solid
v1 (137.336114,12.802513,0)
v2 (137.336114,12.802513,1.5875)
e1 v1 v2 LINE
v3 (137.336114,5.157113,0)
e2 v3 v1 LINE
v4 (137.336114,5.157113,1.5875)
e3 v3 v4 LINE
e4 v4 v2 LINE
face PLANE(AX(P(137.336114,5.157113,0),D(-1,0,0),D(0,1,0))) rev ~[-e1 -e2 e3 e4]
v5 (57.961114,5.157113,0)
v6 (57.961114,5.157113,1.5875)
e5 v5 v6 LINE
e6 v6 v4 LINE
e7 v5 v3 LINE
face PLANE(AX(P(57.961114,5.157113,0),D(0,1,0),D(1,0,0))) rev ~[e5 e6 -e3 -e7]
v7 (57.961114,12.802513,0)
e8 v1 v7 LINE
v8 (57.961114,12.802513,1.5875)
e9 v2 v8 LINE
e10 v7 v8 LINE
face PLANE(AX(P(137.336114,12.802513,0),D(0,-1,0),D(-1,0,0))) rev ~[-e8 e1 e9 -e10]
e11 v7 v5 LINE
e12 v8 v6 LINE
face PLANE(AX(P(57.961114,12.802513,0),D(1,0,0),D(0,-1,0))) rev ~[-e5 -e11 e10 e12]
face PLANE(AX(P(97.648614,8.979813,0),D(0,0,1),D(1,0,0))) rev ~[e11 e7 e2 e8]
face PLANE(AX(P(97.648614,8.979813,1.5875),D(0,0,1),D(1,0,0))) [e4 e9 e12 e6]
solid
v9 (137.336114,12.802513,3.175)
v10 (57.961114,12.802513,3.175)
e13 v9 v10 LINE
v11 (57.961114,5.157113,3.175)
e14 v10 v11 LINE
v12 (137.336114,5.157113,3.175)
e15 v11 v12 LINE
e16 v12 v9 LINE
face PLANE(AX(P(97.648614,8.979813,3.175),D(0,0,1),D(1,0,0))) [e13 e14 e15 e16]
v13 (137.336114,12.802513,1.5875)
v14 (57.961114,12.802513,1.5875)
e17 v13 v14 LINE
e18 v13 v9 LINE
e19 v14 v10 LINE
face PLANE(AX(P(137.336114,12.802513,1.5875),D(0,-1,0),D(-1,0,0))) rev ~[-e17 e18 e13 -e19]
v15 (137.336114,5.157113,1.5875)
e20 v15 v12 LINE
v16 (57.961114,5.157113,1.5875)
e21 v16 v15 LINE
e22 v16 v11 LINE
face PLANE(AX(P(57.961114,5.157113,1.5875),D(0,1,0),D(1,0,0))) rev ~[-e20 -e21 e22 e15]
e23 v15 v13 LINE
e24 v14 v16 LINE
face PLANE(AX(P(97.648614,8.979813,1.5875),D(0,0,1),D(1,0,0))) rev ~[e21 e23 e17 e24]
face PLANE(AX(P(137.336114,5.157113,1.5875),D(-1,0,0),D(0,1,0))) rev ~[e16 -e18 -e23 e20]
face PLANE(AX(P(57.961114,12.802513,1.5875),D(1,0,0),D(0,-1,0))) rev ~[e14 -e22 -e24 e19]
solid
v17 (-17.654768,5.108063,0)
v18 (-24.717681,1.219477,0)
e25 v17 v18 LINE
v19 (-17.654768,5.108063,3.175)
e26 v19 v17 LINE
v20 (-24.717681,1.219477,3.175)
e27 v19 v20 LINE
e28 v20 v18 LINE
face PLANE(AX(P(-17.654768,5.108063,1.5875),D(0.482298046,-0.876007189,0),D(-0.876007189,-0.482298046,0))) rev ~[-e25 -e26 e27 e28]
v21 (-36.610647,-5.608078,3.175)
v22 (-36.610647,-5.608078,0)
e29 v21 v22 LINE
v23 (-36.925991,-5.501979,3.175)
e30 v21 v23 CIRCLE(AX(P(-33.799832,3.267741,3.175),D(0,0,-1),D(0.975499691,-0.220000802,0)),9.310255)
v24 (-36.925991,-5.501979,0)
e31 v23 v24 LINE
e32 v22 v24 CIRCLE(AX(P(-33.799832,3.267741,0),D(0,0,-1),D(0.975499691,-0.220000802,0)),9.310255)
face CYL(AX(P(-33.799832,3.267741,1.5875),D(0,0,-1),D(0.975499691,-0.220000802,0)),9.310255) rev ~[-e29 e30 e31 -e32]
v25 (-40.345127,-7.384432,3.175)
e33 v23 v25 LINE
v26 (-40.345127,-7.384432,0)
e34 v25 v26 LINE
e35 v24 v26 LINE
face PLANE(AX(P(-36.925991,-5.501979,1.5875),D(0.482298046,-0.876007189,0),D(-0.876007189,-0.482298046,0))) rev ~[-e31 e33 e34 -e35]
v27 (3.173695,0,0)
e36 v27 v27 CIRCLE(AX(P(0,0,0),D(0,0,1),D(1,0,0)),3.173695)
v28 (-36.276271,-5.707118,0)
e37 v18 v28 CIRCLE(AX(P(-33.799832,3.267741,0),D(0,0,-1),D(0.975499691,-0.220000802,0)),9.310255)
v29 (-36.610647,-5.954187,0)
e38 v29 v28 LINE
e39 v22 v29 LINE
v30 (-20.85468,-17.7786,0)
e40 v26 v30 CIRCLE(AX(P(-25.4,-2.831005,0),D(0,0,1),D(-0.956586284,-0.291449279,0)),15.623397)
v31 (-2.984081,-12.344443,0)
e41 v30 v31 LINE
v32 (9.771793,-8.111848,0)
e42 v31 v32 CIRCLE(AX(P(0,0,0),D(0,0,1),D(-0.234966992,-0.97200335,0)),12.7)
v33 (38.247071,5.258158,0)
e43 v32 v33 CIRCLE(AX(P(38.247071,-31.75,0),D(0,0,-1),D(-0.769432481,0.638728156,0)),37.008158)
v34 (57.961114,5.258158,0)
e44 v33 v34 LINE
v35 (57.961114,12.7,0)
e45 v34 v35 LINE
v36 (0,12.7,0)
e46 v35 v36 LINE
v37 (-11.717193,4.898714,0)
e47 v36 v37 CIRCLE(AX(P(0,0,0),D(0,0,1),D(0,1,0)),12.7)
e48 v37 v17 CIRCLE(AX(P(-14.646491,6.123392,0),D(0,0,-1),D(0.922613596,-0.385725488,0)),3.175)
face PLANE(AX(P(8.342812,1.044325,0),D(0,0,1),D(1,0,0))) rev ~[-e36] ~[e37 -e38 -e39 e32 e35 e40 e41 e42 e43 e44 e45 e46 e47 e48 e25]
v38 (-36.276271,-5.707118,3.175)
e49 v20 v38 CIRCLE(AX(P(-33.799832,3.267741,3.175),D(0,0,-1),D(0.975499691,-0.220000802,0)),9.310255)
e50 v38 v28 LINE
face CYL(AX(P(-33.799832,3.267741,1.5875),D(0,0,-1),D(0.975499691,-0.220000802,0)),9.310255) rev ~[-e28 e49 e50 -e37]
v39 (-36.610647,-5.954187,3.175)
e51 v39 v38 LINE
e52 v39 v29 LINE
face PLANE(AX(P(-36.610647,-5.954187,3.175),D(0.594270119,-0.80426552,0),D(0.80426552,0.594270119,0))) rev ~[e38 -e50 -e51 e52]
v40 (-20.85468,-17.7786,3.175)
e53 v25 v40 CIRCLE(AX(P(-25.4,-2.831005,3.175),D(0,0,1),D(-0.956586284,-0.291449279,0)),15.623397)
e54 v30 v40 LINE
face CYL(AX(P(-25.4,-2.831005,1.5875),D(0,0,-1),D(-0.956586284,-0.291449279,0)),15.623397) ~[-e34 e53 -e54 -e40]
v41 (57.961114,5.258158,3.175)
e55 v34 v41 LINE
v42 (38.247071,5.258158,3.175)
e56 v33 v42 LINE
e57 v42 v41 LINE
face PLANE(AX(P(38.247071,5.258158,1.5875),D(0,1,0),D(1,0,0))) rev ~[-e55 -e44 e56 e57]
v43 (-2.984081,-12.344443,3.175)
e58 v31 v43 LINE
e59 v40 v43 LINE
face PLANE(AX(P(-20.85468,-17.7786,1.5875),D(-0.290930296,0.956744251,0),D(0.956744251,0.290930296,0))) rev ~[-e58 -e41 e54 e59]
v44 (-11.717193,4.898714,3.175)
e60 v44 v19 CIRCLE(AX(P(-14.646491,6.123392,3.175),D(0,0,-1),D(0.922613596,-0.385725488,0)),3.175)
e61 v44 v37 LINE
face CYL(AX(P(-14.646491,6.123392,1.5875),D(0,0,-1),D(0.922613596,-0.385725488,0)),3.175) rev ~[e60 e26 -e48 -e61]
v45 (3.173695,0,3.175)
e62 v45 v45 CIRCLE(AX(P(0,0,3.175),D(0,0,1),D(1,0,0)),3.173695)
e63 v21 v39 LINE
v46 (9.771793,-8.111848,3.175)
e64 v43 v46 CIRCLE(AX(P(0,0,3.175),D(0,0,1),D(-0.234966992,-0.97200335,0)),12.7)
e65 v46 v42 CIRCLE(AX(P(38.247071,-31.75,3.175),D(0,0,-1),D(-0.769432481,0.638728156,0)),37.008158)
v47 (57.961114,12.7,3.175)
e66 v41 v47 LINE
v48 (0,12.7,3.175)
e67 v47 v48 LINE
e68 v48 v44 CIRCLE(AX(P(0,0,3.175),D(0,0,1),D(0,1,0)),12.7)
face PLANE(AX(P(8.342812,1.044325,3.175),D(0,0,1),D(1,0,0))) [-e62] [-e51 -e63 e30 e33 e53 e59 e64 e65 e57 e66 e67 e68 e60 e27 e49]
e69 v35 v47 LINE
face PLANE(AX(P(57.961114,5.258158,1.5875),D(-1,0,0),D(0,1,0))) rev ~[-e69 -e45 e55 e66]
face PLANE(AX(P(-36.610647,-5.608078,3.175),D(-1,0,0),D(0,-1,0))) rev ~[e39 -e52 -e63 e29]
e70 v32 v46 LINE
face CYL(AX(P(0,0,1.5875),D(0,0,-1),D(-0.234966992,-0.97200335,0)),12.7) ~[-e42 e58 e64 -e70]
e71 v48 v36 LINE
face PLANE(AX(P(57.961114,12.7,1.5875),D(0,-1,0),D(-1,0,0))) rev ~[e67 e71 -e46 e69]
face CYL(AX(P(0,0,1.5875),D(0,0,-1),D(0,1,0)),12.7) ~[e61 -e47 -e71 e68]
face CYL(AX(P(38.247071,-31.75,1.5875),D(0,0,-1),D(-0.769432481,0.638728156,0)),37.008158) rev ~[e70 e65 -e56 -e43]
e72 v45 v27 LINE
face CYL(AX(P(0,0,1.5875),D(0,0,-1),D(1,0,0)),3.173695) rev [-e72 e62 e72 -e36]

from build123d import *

# Parameters (mm, degrees)
F1_R     = 3.1736948077
F2_DEPTH = 1.5875
F3_DEPTH = 1.5875
F4_DEPTH = 1.5875
F6_DEPTH = 25.4


with BuildPart() as f2:
    # F1 (on face) → F2 (new body)
    with BuildSketch(Plane.XY):
        with BuildLine():
            ThreePointArc((-40.3451274018, -7.3844323762), (-32.7517807814, -16.6165715435), (-20.8546804416, -17.7785999452))
            Line((-20.8546804416, -17.7785999452), (-2.9840807938, -12.3444425478))
            ThreePointArc((-2.9840807938, -12.3444425478), (3.9996215585, -12.0537557379), (9.771792507, -8.1118475823))
            ThreePointArc((9.771792507, -8.1118475823), (22.5181286005, 1.749315086), (38.2470712066, 5.2581578403))
            Line((38.2470712066, 5.2581578403), (57.9611142654, 5.2581578403))
            Line((57.9611142654, 5.2581578403), (57.9611142654, 12.7))
            Line((57.9611142654, 12.7), (0, 12.7))
            ThreePointArc((0, 12.7), (-7.0383356023, 10.5712739038), (-11.7171926739, 4.8987136927))
            ThreePointArc((-11.7171926739, 4.8987136927), (-14.7583668014, 2.950363788), (-17.6547681255, 5.1080632099))
            Line((-17.6547681255, 5.1080632099), (-24.7176810189, 1.2194774422))
            ThreePointArc((-24.7176810189, 1.2194774422), (-29.3095141905, -4.8881094223), (-36.925990654, -5.5019786781))
            Line((-36.925990654, -5.5019786781), (-40.3451274018, -7.3844323762))
        make_face()
        Circle(F1_R, mode=Mode.SUBTRACT)
    extrude(amount=F2_DEPTH)

    # F3 (add): a face of the model
    f3_faces = [f2.faces().sort_by_distance(p)[0] for p in [
        (-6.4668185994, 9.7128802267, 1.5875),
    ]]
    extrude(f3_faces, amount=F3_DEPTH)

    # F5 (on face) → F6 (cut)
    with BuildSketch(Plane.XY.offset(3.175)):
        with BuildLine():
            ThreePointArc((-36.2762714732, -5.7071182517), (-36.4439228923, -5.6591640871), (-36.6106467962, -5.6080784715))
            Line((-36.6106467962, -5.6080784715), (-36.6106467962, -5.954187482))
            Line((-36.6106467962, -5.954187482), (-36.2762714732, -5.7071182517))
        make_face()
    extrude(amount=-F6_DEPTH, mode=Mode.SUBTRACT)


with BuildPart() as f2b:
    # F0 (on Top) → F2, piece 2 (new body)
    with BuildSketch(Plane.XY):
        Polygon((57.9611142654, 12.7), (57.9611142654, 5.2581578403), (57.9611142654, 5.1571133081), (137.3361142654, 5.1571133081), (137.3361142654, 12.8025133081), (57.9611142654, 12.8025133081), align=None)
    extrude(amount=F2_DEPTH)


with BuildPart() as f4:
    # F4 (new): a face of the model
    f4_faces = [f2b.part.faces().sort_by_distance(p)[0] for p in [
        (97.6486142654, 8.9798133081, 1.5875),
    ]]
    extrude(f4_faces, amount=F4_DEPTH)


solid = Compound([f2.part, f2b.part, f4.part])
